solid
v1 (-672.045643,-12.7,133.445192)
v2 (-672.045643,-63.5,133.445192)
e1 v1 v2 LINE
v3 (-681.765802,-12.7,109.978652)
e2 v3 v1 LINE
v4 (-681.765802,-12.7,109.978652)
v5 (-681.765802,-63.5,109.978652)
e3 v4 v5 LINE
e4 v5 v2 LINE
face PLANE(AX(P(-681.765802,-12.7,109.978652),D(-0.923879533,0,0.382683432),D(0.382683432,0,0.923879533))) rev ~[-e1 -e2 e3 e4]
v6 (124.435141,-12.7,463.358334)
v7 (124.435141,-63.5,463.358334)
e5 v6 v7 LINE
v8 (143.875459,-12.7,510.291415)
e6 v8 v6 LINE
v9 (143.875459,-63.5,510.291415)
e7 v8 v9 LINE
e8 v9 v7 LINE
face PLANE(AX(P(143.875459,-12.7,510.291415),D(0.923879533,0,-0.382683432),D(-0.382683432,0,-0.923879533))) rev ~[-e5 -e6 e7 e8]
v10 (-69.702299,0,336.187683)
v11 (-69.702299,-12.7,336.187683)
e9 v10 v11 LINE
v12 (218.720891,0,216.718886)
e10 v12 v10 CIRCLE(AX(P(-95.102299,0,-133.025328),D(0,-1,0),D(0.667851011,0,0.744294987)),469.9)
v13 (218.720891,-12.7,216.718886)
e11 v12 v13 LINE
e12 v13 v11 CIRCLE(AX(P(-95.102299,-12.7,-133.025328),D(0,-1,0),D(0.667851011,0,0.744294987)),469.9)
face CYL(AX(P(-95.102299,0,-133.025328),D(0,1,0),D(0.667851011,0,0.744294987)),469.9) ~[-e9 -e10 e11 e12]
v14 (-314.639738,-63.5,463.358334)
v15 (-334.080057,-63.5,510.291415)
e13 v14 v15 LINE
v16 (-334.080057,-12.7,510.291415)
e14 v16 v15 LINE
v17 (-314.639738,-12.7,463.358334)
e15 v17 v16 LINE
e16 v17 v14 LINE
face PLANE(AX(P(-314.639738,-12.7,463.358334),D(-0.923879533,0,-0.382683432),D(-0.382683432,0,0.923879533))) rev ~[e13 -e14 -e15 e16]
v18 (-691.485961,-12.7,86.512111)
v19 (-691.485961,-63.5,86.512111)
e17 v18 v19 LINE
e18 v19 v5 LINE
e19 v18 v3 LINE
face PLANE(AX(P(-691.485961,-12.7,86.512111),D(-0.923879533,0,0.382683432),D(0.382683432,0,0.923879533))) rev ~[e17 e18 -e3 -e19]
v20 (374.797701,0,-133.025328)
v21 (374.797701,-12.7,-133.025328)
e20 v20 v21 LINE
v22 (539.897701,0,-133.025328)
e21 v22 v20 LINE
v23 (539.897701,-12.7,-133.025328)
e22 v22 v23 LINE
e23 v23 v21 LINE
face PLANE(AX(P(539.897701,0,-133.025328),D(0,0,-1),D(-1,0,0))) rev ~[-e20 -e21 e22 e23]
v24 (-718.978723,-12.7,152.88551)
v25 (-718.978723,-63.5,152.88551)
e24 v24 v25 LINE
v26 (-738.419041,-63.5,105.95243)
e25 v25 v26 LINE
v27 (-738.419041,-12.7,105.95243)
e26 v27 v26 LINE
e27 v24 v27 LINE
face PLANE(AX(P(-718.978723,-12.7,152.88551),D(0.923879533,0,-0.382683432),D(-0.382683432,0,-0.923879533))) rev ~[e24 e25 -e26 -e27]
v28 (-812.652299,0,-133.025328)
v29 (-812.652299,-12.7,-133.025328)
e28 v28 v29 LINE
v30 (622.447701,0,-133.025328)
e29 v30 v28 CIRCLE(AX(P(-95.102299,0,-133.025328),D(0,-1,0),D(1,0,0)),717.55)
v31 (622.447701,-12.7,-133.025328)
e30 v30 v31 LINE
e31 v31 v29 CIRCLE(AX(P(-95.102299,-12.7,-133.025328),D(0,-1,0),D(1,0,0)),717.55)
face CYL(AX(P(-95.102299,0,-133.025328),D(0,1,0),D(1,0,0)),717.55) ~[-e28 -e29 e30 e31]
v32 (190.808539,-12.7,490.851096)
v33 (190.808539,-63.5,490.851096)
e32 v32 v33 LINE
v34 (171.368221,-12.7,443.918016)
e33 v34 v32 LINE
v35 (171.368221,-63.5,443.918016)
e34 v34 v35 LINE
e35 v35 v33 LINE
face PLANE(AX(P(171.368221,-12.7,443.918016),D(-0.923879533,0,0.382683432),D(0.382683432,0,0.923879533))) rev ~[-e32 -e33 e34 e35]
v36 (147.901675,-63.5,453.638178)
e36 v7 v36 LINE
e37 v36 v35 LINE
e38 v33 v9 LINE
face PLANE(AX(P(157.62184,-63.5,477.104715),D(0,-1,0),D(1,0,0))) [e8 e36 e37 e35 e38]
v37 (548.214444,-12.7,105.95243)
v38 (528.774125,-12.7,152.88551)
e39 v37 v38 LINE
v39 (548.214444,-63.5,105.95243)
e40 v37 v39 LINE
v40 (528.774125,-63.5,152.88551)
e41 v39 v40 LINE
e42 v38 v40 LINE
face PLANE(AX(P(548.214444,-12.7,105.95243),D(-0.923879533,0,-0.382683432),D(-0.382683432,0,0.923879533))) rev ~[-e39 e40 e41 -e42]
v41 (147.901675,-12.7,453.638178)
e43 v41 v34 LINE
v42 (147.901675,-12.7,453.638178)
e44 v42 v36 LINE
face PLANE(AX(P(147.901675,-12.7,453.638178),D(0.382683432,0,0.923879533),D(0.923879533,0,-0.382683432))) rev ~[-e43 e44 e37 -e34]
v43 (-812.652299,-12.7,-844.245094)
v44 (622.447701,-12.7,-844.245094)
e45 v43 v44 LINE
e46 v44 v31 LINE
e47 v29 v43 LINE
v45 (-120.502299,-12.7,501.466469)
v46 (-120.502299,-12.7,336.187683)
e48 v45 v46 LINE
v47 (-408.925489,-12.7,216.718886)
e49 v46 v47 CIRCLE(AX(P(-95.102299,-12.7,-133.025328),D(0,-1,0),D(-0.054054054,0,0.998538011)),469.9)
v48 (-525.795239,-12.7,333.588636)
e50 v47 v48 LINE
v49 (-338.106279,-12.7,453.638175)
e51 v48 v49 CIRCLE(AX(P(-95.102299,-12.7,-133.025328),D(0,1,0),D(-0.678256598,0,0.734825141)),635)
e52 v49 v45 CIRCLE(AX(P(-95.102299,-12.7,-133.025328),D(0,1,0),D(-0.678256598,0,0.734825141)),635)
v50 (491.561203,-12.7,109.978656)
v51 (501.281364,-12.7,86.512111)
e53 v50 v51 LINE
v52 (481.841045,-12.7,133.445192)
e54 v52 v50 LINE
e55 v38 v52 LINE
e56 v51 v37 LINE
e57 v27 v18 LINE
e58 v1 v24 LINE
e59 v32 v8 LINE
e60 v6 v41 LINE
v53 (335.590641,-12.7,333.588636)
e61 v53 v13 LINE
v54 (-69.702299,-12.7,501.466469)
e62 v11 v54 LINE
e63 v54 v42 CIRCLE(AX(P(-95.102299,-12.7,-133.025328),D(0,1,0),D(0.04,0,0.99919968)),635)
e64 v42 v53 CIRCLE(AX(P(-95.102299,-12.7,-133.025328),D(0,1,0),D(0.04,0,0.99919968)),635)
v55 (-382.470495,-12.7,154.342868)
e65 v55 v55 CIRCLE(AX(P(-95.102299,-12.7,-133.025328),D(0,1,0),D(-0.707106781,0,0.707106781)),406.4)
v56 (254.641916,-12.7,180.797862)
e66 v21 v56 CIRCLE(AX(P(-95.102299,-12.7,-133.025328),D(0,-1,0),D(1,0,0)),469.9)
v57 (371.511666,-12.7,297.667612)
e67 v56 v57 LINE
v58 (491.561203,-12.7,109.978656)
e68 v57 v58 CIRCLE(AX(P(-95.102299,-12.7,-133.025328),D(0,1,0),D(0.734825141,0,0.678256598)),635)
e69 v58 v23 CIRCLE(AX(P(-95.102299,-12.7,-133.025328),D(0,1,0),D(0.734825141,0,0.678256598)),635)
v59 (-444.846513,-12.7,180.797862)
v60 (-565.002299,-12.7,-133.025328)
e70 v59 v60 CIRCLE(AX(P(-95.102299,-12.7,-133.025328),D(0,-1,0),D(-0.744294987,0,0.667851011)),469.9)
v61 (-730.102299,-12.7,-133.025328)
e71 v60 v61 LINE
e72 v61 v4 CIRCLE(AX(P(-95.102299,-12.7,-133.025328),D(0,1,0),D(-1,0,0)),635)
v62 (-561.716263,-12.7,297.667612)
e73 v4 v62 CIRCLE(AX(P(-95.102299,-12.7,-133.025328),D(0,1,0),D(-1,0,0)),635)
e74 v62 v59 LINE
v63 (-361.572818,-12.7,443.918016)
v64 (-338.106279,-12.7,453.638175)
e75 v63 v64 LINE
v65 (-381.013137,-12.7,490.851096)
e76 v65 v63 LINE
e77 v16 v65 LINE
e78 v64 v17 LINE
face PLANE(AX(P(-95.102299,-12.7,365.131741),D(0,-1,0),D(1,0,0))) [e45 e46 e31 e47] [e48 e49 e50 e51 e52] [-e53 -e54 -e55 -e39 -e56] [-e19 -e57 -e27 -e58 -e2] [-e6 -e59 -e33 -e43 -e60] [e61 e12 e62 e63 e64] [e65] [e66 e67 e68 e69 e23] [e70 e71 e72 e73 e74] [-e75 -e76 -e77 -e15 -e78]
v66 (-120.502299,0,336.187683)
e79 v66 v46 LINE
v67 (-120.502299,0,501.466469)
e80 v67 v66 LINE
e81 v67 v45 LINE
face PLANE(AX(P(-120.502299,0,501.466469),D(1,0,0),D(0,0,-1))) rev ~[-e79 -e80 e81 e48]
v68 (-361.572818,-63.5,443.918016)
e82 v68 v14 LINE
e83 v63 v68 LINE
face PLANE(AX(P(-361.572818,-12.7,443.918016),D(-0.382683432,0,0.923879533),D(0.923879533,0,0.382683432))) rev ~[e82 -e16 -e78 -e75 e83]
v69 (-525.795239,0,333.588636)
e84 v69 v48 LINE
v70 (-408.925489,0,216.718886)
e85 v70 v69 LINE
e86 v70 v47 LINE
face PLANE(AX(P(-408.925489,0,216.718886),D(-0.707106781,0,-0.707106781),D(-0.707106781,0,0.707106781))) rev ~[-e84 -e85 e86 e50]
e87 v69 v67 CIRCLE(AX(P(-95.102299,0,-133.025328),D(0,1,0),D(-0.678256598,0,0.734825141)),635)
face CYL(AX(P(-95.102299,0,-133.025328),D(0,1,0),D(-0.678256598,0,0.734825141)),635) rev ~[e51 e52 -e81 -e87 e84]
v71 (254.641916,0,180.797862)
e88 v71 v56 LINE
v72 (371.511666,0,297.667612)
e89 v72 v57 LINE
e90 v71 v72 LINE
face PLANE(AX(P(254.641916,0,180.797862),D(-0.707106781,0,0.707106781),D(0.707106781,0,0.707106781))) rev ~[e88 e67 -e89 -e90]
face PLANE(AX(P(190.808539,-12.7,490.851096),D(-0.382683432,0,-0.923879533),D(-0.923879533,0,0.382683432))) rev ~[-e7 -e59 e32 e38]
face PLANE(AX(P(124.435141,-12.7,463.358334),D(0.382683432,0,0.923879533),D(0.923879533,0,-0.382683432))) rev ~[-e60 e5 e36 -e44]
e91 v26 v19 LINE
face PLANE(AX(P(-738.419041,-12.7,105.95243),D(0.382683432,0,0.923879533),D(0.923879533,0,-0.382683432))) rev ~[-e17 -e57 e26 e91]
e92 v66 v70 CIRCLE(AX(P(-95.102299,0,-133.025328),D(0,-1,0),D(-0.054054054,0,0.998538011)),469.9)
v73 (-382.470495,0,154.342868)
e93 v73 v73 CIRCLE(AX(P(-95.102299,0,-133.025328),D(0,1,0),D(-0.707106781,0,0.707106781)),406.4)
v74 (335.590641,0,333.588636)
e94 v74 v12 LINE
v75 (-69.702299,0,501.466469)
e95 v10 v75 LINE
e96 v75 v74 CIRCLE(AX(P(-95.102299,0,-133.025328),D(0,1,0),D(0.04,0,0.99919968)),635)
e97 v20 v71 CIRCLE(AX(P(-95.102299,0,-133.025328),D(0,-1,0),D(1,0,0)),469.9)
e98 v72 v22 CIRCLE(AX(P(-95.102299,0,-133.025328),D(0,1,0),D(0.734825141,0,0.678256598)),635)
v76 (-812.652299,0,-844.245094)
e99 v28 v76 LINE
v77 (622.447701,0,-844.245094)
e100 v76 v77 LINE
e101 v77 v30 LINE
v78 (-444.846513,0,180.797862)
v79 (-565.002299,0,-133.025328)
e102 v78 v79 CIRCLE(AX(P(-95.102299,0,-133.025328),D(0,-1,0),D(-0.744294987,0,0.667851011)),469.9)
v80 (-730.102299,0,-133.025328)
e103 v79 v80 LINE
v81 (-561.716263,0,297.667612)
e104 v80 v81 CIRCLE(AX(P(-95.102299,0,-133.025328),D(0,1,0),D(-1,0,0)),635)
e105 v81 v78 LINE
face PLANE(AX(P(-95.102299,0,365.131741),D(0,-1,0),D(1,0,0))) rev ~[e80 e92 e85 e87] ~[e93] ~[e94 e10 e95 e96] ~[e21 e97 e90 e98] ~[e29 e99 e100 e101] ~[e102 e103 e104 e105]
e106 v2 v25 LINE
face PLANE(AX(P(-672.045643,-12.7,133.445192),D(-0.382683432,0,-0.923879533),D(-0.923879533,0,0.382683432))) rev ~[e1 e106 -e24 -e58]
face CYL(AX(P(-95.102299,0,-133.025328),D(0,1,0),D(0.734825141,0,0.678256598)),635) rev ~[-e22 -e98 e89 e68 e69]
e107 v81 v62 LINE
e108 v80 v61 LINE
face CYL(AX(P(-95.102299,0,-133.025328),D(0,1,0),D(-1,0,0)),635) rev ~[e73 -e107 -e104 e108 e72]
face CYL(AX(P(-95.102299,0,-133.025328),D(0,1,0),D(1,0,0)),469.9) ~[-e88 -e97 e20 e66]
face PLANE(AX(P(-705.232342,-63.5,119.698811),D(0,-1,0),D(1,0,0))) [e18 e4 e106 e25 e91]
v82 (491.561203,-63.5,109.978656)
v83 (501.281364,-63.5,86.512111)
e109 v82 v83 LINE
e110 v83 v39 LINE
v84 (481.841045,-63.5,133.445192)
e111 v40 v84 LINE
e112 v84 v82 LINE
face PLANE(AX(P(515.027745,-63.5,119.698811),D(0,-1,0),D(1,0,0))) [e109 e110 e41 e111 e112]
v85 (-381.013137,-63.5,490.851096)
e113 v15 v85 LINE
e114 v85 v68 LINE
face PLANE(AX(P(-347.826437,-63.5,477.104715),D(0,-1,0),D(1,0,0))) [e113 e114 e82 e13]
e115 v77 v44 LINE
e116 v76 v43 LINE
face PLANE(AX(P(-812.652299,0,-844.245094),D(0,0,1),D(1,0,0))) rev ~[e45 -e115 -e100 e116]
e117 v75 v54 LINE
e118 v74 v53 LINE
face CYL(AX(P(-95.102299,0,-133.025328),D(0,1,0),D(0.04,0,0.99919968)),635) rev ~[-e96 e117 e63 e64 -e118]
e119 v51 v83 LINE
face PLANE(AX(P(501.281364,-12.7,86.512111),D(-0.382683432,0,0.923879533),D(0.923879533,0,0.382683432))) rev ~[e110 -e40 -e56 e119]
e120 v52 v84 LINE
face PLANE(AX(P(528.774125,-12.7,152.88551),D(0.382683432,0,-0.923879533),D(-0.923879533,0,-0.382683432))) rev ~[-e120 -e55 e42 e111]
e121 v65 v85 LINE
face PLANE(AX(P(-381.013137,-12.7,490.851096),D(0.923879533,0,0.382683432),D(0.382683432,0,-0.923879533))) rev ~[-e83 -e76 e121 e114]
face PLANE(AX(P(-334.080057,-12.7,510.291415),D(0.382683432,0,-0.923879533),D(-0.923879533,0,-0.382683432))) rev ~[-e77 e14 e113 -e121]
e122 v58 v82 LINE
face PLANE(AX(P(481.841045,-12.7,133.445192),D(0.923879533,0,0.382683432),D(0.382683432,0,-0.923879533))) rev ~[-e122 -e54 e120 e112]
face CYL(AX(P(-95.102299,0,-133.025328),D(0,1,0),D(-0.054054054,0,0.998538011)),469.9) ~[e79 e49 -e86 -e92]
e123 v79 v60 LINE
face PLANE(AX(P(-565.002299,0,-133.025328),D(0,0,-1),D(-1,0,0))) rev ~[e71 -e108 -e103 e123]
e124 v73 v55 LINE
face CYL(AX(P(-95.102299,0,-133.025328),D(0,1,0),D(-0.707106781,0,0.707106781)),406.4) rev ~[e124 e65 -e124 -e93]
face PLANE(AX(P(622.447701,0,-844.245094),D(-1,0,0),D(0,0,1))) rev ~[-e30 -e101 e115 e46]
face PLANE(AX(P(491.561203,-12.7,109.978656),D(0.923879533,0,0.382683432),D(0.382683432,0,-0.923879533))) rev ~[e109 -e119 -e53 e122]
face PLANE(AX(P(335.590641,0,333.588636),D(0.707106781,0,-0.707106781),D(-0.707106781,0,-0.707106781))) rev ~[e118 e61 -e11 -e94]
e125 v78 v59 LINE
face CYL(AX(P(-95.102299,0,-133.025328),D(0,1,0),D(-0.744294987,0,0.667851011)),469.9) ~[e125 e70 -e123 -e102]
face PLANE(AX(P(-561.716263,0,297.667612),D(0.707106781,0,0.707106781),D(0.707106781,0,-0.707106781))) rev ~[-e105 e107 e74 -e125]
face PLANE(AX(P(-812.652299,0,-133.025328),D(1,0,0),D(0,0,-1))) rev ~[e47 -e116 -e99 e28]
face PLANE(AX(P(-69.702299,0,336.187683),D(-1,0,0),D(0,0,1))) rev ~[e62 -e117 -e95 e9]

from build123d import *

# Parameters (mm, degrees)
F1_DEPTH = 12.7
F3_DEPTH = 50.8


# Not quite as in the source:
# - a feature names something its author has since deleted; it is built from what else it names


with BuildPart() as f1:
    # F0 (on Front) → F1 (new body)
    with BuildSketch(Plane.XZ):
        with BuildLine():
            ThreePointArc((-95.1022987413, 273.3746719669), (60.4202481719, 242.4393139794), (192.265897133, 154.3428678411))
            Line((192.265897133, 154.3428678411), (412.2821720991, 374.3591428073))
            ThreePointArc((412.2821720992, 374.3591428073), (-95.1022987413, 584.5246719669), (-602.4867695817, 374.3591428072))
            Line((-602.4867695817, 374.3591428073), (-382.4704946155, 154.3428678411))
            ThreePointArc((-382.4704946155, 154.3428678411), (-250.6248456544, 242.4393139794), (-95.1022987413, 273.3746719669))
        make_face()
        with BuildLine():
            ThreePointArc((-525.7952385086, 333.5886362184), (-338.1062782931, 453.6381751115), (-120.5022987413, 501.4664686041))
            Line((-120.5022987413, 501.4664686041), (-120.5022987413, 336.1876832954))
            ThreePointArc((-120.5022987413, 336.1876832954), (-274.9252436096, 301.1056642939), (-408.9254886305, 216.7188863404))
            Line((-408.9254886305, 216.7188863404), (-525.7952385086, 333.5886362184))
        make_face(mode=Mode.SUBTRACT)
        with BuildLine():
            Line((-69.7022987413, 336.1876832954), (-69.7022987413, 501.4664686041))
            ThreePointArc((-69.7022987413, 501.4664686041), (147.9016808106, 453.6381751115), (335.5906410261, 333.5886362184))
            Line((335.5906410261, 333.5886362184), (218.720891148, 216.7188863404))
            ThreePointArc((218.720891148, 216.7188863404), (84.7206461271, 301.1056642939), (-69.7022987413, 336.1876832954))
        make_face(mode=Mode.SUBTRACT)
        with BuildLine():
            ThreePointArc((192.265897133, 154.3428678411), (280.3623432713, 22.49721888), (311.2977012587, -133.0253280331))
            ThreePointArc((311.2977012587, -133.0253280331), (-250.6248456544, -508.4899700457), (-382.4704946155, 154.3428678411))
            Line((-382.4704946155, 154.3428678411), (-602.4867695817, 374.3591428073))
            ThreePointArc((-602.4867695817, 374.3591428072), (-758.0320572947, 141.5691688604), (-812.6522987413, -133.0253280331))
            Line((-812.6522987413, -133.0253280331), (-812.6522987413, -844.2450938398))
            Line((-812.6522987413, -844.2450938398), (0, -844.2450938398))
            Line((0, -844.2450938398), (622.4477012587, -844.2450938398))
            Line((622.4477012587, -844.2450938398), (622.4477012587, -133.0253280331))
            ThreePointArc((622.4477012587, -133.0253280331), (567.8274598122, 141.5691688604), (412.2821720992, 374.3591428073))
            Line((412.2821720991, 374.3591428073), (192.265897133, 154.3428678411))
        make_face()
        with BuildLine():
            ThreePointArc((-444.8465131148, 180.7978618561), (-533.9364452785, 34.9943191303), (-565.0022987413, -133.0253280331))
            Line((-565.0022987413, -133.0253280331), (-730.1022987413, -133.0253280331))
            ThreePointArc((-730.1022987413, -133.0253280331), (-686.5094627576, 98.1944080408), (-561.7162629929, 297.6676117342))
            Line((-561.7162629929, 297.6676117342), (-444.8465131148, 180.7978618561))
        make_face(mode=Mode.SUBTRACT)
        with BuildLine():
            ThreePointArc((371.5116655103, 297.6676117342), (496.3048652751, 98.1944080408), (539.8977012587, -133.0253280331))
            Line((539.8977012587, -133.0253280331), (374.7977012587, -133.0253280331))
            ThreePointArc((374.7977012587, -133.0253280331), (343.731847796, 34.9943191303), (254.6419156323, 180.7978618561))
            Line((254.6419156323, 180.7978618561), (371.5116655103, 297.6676117342))
        make_face(mode=Mode.SUBTRACT)
    extrude(amount=F1_DEPTH)

    # F2 (on face) → F3 (join)
    with BuildSketch(Plane.XZ.offset(12.7)):
        Polygon((-691.485961068, 86.5121113929), (-681.7658018859, 109.9786515187), (-672.0456427039, 133.4451916445), (-718.9787229554, 152.8855100086), (-738.4190413196, 105.952429757), align=None)
        Polygon((528.7741254729, 152.8855100086), (481.8410452213, 133.4451916445), (491.5612025764, 109.9786559296), (501.2813635855, 86.5121113929), (548.2144438371, 105.952429757), align=None)
        Polygon((-381.013136783, 490.851096181), (-361.5728184189, 443.9180159294), (-338.1062857272, 453.6381720322), (-314.6397381673, 463.3583342936), (-334.0800565315, 510.2914145452), align=None)
        Polygon((143.8754590489, 510.2914145452), (124.4351406848, 463.3583342936), (147.9016748411, 453.6381775841), (171.3682209364, 443.9180159294), (190.8085393005, 490.851096181), align=None)
    extrude(amount=F3_DEPTH)


solid = f1.part
